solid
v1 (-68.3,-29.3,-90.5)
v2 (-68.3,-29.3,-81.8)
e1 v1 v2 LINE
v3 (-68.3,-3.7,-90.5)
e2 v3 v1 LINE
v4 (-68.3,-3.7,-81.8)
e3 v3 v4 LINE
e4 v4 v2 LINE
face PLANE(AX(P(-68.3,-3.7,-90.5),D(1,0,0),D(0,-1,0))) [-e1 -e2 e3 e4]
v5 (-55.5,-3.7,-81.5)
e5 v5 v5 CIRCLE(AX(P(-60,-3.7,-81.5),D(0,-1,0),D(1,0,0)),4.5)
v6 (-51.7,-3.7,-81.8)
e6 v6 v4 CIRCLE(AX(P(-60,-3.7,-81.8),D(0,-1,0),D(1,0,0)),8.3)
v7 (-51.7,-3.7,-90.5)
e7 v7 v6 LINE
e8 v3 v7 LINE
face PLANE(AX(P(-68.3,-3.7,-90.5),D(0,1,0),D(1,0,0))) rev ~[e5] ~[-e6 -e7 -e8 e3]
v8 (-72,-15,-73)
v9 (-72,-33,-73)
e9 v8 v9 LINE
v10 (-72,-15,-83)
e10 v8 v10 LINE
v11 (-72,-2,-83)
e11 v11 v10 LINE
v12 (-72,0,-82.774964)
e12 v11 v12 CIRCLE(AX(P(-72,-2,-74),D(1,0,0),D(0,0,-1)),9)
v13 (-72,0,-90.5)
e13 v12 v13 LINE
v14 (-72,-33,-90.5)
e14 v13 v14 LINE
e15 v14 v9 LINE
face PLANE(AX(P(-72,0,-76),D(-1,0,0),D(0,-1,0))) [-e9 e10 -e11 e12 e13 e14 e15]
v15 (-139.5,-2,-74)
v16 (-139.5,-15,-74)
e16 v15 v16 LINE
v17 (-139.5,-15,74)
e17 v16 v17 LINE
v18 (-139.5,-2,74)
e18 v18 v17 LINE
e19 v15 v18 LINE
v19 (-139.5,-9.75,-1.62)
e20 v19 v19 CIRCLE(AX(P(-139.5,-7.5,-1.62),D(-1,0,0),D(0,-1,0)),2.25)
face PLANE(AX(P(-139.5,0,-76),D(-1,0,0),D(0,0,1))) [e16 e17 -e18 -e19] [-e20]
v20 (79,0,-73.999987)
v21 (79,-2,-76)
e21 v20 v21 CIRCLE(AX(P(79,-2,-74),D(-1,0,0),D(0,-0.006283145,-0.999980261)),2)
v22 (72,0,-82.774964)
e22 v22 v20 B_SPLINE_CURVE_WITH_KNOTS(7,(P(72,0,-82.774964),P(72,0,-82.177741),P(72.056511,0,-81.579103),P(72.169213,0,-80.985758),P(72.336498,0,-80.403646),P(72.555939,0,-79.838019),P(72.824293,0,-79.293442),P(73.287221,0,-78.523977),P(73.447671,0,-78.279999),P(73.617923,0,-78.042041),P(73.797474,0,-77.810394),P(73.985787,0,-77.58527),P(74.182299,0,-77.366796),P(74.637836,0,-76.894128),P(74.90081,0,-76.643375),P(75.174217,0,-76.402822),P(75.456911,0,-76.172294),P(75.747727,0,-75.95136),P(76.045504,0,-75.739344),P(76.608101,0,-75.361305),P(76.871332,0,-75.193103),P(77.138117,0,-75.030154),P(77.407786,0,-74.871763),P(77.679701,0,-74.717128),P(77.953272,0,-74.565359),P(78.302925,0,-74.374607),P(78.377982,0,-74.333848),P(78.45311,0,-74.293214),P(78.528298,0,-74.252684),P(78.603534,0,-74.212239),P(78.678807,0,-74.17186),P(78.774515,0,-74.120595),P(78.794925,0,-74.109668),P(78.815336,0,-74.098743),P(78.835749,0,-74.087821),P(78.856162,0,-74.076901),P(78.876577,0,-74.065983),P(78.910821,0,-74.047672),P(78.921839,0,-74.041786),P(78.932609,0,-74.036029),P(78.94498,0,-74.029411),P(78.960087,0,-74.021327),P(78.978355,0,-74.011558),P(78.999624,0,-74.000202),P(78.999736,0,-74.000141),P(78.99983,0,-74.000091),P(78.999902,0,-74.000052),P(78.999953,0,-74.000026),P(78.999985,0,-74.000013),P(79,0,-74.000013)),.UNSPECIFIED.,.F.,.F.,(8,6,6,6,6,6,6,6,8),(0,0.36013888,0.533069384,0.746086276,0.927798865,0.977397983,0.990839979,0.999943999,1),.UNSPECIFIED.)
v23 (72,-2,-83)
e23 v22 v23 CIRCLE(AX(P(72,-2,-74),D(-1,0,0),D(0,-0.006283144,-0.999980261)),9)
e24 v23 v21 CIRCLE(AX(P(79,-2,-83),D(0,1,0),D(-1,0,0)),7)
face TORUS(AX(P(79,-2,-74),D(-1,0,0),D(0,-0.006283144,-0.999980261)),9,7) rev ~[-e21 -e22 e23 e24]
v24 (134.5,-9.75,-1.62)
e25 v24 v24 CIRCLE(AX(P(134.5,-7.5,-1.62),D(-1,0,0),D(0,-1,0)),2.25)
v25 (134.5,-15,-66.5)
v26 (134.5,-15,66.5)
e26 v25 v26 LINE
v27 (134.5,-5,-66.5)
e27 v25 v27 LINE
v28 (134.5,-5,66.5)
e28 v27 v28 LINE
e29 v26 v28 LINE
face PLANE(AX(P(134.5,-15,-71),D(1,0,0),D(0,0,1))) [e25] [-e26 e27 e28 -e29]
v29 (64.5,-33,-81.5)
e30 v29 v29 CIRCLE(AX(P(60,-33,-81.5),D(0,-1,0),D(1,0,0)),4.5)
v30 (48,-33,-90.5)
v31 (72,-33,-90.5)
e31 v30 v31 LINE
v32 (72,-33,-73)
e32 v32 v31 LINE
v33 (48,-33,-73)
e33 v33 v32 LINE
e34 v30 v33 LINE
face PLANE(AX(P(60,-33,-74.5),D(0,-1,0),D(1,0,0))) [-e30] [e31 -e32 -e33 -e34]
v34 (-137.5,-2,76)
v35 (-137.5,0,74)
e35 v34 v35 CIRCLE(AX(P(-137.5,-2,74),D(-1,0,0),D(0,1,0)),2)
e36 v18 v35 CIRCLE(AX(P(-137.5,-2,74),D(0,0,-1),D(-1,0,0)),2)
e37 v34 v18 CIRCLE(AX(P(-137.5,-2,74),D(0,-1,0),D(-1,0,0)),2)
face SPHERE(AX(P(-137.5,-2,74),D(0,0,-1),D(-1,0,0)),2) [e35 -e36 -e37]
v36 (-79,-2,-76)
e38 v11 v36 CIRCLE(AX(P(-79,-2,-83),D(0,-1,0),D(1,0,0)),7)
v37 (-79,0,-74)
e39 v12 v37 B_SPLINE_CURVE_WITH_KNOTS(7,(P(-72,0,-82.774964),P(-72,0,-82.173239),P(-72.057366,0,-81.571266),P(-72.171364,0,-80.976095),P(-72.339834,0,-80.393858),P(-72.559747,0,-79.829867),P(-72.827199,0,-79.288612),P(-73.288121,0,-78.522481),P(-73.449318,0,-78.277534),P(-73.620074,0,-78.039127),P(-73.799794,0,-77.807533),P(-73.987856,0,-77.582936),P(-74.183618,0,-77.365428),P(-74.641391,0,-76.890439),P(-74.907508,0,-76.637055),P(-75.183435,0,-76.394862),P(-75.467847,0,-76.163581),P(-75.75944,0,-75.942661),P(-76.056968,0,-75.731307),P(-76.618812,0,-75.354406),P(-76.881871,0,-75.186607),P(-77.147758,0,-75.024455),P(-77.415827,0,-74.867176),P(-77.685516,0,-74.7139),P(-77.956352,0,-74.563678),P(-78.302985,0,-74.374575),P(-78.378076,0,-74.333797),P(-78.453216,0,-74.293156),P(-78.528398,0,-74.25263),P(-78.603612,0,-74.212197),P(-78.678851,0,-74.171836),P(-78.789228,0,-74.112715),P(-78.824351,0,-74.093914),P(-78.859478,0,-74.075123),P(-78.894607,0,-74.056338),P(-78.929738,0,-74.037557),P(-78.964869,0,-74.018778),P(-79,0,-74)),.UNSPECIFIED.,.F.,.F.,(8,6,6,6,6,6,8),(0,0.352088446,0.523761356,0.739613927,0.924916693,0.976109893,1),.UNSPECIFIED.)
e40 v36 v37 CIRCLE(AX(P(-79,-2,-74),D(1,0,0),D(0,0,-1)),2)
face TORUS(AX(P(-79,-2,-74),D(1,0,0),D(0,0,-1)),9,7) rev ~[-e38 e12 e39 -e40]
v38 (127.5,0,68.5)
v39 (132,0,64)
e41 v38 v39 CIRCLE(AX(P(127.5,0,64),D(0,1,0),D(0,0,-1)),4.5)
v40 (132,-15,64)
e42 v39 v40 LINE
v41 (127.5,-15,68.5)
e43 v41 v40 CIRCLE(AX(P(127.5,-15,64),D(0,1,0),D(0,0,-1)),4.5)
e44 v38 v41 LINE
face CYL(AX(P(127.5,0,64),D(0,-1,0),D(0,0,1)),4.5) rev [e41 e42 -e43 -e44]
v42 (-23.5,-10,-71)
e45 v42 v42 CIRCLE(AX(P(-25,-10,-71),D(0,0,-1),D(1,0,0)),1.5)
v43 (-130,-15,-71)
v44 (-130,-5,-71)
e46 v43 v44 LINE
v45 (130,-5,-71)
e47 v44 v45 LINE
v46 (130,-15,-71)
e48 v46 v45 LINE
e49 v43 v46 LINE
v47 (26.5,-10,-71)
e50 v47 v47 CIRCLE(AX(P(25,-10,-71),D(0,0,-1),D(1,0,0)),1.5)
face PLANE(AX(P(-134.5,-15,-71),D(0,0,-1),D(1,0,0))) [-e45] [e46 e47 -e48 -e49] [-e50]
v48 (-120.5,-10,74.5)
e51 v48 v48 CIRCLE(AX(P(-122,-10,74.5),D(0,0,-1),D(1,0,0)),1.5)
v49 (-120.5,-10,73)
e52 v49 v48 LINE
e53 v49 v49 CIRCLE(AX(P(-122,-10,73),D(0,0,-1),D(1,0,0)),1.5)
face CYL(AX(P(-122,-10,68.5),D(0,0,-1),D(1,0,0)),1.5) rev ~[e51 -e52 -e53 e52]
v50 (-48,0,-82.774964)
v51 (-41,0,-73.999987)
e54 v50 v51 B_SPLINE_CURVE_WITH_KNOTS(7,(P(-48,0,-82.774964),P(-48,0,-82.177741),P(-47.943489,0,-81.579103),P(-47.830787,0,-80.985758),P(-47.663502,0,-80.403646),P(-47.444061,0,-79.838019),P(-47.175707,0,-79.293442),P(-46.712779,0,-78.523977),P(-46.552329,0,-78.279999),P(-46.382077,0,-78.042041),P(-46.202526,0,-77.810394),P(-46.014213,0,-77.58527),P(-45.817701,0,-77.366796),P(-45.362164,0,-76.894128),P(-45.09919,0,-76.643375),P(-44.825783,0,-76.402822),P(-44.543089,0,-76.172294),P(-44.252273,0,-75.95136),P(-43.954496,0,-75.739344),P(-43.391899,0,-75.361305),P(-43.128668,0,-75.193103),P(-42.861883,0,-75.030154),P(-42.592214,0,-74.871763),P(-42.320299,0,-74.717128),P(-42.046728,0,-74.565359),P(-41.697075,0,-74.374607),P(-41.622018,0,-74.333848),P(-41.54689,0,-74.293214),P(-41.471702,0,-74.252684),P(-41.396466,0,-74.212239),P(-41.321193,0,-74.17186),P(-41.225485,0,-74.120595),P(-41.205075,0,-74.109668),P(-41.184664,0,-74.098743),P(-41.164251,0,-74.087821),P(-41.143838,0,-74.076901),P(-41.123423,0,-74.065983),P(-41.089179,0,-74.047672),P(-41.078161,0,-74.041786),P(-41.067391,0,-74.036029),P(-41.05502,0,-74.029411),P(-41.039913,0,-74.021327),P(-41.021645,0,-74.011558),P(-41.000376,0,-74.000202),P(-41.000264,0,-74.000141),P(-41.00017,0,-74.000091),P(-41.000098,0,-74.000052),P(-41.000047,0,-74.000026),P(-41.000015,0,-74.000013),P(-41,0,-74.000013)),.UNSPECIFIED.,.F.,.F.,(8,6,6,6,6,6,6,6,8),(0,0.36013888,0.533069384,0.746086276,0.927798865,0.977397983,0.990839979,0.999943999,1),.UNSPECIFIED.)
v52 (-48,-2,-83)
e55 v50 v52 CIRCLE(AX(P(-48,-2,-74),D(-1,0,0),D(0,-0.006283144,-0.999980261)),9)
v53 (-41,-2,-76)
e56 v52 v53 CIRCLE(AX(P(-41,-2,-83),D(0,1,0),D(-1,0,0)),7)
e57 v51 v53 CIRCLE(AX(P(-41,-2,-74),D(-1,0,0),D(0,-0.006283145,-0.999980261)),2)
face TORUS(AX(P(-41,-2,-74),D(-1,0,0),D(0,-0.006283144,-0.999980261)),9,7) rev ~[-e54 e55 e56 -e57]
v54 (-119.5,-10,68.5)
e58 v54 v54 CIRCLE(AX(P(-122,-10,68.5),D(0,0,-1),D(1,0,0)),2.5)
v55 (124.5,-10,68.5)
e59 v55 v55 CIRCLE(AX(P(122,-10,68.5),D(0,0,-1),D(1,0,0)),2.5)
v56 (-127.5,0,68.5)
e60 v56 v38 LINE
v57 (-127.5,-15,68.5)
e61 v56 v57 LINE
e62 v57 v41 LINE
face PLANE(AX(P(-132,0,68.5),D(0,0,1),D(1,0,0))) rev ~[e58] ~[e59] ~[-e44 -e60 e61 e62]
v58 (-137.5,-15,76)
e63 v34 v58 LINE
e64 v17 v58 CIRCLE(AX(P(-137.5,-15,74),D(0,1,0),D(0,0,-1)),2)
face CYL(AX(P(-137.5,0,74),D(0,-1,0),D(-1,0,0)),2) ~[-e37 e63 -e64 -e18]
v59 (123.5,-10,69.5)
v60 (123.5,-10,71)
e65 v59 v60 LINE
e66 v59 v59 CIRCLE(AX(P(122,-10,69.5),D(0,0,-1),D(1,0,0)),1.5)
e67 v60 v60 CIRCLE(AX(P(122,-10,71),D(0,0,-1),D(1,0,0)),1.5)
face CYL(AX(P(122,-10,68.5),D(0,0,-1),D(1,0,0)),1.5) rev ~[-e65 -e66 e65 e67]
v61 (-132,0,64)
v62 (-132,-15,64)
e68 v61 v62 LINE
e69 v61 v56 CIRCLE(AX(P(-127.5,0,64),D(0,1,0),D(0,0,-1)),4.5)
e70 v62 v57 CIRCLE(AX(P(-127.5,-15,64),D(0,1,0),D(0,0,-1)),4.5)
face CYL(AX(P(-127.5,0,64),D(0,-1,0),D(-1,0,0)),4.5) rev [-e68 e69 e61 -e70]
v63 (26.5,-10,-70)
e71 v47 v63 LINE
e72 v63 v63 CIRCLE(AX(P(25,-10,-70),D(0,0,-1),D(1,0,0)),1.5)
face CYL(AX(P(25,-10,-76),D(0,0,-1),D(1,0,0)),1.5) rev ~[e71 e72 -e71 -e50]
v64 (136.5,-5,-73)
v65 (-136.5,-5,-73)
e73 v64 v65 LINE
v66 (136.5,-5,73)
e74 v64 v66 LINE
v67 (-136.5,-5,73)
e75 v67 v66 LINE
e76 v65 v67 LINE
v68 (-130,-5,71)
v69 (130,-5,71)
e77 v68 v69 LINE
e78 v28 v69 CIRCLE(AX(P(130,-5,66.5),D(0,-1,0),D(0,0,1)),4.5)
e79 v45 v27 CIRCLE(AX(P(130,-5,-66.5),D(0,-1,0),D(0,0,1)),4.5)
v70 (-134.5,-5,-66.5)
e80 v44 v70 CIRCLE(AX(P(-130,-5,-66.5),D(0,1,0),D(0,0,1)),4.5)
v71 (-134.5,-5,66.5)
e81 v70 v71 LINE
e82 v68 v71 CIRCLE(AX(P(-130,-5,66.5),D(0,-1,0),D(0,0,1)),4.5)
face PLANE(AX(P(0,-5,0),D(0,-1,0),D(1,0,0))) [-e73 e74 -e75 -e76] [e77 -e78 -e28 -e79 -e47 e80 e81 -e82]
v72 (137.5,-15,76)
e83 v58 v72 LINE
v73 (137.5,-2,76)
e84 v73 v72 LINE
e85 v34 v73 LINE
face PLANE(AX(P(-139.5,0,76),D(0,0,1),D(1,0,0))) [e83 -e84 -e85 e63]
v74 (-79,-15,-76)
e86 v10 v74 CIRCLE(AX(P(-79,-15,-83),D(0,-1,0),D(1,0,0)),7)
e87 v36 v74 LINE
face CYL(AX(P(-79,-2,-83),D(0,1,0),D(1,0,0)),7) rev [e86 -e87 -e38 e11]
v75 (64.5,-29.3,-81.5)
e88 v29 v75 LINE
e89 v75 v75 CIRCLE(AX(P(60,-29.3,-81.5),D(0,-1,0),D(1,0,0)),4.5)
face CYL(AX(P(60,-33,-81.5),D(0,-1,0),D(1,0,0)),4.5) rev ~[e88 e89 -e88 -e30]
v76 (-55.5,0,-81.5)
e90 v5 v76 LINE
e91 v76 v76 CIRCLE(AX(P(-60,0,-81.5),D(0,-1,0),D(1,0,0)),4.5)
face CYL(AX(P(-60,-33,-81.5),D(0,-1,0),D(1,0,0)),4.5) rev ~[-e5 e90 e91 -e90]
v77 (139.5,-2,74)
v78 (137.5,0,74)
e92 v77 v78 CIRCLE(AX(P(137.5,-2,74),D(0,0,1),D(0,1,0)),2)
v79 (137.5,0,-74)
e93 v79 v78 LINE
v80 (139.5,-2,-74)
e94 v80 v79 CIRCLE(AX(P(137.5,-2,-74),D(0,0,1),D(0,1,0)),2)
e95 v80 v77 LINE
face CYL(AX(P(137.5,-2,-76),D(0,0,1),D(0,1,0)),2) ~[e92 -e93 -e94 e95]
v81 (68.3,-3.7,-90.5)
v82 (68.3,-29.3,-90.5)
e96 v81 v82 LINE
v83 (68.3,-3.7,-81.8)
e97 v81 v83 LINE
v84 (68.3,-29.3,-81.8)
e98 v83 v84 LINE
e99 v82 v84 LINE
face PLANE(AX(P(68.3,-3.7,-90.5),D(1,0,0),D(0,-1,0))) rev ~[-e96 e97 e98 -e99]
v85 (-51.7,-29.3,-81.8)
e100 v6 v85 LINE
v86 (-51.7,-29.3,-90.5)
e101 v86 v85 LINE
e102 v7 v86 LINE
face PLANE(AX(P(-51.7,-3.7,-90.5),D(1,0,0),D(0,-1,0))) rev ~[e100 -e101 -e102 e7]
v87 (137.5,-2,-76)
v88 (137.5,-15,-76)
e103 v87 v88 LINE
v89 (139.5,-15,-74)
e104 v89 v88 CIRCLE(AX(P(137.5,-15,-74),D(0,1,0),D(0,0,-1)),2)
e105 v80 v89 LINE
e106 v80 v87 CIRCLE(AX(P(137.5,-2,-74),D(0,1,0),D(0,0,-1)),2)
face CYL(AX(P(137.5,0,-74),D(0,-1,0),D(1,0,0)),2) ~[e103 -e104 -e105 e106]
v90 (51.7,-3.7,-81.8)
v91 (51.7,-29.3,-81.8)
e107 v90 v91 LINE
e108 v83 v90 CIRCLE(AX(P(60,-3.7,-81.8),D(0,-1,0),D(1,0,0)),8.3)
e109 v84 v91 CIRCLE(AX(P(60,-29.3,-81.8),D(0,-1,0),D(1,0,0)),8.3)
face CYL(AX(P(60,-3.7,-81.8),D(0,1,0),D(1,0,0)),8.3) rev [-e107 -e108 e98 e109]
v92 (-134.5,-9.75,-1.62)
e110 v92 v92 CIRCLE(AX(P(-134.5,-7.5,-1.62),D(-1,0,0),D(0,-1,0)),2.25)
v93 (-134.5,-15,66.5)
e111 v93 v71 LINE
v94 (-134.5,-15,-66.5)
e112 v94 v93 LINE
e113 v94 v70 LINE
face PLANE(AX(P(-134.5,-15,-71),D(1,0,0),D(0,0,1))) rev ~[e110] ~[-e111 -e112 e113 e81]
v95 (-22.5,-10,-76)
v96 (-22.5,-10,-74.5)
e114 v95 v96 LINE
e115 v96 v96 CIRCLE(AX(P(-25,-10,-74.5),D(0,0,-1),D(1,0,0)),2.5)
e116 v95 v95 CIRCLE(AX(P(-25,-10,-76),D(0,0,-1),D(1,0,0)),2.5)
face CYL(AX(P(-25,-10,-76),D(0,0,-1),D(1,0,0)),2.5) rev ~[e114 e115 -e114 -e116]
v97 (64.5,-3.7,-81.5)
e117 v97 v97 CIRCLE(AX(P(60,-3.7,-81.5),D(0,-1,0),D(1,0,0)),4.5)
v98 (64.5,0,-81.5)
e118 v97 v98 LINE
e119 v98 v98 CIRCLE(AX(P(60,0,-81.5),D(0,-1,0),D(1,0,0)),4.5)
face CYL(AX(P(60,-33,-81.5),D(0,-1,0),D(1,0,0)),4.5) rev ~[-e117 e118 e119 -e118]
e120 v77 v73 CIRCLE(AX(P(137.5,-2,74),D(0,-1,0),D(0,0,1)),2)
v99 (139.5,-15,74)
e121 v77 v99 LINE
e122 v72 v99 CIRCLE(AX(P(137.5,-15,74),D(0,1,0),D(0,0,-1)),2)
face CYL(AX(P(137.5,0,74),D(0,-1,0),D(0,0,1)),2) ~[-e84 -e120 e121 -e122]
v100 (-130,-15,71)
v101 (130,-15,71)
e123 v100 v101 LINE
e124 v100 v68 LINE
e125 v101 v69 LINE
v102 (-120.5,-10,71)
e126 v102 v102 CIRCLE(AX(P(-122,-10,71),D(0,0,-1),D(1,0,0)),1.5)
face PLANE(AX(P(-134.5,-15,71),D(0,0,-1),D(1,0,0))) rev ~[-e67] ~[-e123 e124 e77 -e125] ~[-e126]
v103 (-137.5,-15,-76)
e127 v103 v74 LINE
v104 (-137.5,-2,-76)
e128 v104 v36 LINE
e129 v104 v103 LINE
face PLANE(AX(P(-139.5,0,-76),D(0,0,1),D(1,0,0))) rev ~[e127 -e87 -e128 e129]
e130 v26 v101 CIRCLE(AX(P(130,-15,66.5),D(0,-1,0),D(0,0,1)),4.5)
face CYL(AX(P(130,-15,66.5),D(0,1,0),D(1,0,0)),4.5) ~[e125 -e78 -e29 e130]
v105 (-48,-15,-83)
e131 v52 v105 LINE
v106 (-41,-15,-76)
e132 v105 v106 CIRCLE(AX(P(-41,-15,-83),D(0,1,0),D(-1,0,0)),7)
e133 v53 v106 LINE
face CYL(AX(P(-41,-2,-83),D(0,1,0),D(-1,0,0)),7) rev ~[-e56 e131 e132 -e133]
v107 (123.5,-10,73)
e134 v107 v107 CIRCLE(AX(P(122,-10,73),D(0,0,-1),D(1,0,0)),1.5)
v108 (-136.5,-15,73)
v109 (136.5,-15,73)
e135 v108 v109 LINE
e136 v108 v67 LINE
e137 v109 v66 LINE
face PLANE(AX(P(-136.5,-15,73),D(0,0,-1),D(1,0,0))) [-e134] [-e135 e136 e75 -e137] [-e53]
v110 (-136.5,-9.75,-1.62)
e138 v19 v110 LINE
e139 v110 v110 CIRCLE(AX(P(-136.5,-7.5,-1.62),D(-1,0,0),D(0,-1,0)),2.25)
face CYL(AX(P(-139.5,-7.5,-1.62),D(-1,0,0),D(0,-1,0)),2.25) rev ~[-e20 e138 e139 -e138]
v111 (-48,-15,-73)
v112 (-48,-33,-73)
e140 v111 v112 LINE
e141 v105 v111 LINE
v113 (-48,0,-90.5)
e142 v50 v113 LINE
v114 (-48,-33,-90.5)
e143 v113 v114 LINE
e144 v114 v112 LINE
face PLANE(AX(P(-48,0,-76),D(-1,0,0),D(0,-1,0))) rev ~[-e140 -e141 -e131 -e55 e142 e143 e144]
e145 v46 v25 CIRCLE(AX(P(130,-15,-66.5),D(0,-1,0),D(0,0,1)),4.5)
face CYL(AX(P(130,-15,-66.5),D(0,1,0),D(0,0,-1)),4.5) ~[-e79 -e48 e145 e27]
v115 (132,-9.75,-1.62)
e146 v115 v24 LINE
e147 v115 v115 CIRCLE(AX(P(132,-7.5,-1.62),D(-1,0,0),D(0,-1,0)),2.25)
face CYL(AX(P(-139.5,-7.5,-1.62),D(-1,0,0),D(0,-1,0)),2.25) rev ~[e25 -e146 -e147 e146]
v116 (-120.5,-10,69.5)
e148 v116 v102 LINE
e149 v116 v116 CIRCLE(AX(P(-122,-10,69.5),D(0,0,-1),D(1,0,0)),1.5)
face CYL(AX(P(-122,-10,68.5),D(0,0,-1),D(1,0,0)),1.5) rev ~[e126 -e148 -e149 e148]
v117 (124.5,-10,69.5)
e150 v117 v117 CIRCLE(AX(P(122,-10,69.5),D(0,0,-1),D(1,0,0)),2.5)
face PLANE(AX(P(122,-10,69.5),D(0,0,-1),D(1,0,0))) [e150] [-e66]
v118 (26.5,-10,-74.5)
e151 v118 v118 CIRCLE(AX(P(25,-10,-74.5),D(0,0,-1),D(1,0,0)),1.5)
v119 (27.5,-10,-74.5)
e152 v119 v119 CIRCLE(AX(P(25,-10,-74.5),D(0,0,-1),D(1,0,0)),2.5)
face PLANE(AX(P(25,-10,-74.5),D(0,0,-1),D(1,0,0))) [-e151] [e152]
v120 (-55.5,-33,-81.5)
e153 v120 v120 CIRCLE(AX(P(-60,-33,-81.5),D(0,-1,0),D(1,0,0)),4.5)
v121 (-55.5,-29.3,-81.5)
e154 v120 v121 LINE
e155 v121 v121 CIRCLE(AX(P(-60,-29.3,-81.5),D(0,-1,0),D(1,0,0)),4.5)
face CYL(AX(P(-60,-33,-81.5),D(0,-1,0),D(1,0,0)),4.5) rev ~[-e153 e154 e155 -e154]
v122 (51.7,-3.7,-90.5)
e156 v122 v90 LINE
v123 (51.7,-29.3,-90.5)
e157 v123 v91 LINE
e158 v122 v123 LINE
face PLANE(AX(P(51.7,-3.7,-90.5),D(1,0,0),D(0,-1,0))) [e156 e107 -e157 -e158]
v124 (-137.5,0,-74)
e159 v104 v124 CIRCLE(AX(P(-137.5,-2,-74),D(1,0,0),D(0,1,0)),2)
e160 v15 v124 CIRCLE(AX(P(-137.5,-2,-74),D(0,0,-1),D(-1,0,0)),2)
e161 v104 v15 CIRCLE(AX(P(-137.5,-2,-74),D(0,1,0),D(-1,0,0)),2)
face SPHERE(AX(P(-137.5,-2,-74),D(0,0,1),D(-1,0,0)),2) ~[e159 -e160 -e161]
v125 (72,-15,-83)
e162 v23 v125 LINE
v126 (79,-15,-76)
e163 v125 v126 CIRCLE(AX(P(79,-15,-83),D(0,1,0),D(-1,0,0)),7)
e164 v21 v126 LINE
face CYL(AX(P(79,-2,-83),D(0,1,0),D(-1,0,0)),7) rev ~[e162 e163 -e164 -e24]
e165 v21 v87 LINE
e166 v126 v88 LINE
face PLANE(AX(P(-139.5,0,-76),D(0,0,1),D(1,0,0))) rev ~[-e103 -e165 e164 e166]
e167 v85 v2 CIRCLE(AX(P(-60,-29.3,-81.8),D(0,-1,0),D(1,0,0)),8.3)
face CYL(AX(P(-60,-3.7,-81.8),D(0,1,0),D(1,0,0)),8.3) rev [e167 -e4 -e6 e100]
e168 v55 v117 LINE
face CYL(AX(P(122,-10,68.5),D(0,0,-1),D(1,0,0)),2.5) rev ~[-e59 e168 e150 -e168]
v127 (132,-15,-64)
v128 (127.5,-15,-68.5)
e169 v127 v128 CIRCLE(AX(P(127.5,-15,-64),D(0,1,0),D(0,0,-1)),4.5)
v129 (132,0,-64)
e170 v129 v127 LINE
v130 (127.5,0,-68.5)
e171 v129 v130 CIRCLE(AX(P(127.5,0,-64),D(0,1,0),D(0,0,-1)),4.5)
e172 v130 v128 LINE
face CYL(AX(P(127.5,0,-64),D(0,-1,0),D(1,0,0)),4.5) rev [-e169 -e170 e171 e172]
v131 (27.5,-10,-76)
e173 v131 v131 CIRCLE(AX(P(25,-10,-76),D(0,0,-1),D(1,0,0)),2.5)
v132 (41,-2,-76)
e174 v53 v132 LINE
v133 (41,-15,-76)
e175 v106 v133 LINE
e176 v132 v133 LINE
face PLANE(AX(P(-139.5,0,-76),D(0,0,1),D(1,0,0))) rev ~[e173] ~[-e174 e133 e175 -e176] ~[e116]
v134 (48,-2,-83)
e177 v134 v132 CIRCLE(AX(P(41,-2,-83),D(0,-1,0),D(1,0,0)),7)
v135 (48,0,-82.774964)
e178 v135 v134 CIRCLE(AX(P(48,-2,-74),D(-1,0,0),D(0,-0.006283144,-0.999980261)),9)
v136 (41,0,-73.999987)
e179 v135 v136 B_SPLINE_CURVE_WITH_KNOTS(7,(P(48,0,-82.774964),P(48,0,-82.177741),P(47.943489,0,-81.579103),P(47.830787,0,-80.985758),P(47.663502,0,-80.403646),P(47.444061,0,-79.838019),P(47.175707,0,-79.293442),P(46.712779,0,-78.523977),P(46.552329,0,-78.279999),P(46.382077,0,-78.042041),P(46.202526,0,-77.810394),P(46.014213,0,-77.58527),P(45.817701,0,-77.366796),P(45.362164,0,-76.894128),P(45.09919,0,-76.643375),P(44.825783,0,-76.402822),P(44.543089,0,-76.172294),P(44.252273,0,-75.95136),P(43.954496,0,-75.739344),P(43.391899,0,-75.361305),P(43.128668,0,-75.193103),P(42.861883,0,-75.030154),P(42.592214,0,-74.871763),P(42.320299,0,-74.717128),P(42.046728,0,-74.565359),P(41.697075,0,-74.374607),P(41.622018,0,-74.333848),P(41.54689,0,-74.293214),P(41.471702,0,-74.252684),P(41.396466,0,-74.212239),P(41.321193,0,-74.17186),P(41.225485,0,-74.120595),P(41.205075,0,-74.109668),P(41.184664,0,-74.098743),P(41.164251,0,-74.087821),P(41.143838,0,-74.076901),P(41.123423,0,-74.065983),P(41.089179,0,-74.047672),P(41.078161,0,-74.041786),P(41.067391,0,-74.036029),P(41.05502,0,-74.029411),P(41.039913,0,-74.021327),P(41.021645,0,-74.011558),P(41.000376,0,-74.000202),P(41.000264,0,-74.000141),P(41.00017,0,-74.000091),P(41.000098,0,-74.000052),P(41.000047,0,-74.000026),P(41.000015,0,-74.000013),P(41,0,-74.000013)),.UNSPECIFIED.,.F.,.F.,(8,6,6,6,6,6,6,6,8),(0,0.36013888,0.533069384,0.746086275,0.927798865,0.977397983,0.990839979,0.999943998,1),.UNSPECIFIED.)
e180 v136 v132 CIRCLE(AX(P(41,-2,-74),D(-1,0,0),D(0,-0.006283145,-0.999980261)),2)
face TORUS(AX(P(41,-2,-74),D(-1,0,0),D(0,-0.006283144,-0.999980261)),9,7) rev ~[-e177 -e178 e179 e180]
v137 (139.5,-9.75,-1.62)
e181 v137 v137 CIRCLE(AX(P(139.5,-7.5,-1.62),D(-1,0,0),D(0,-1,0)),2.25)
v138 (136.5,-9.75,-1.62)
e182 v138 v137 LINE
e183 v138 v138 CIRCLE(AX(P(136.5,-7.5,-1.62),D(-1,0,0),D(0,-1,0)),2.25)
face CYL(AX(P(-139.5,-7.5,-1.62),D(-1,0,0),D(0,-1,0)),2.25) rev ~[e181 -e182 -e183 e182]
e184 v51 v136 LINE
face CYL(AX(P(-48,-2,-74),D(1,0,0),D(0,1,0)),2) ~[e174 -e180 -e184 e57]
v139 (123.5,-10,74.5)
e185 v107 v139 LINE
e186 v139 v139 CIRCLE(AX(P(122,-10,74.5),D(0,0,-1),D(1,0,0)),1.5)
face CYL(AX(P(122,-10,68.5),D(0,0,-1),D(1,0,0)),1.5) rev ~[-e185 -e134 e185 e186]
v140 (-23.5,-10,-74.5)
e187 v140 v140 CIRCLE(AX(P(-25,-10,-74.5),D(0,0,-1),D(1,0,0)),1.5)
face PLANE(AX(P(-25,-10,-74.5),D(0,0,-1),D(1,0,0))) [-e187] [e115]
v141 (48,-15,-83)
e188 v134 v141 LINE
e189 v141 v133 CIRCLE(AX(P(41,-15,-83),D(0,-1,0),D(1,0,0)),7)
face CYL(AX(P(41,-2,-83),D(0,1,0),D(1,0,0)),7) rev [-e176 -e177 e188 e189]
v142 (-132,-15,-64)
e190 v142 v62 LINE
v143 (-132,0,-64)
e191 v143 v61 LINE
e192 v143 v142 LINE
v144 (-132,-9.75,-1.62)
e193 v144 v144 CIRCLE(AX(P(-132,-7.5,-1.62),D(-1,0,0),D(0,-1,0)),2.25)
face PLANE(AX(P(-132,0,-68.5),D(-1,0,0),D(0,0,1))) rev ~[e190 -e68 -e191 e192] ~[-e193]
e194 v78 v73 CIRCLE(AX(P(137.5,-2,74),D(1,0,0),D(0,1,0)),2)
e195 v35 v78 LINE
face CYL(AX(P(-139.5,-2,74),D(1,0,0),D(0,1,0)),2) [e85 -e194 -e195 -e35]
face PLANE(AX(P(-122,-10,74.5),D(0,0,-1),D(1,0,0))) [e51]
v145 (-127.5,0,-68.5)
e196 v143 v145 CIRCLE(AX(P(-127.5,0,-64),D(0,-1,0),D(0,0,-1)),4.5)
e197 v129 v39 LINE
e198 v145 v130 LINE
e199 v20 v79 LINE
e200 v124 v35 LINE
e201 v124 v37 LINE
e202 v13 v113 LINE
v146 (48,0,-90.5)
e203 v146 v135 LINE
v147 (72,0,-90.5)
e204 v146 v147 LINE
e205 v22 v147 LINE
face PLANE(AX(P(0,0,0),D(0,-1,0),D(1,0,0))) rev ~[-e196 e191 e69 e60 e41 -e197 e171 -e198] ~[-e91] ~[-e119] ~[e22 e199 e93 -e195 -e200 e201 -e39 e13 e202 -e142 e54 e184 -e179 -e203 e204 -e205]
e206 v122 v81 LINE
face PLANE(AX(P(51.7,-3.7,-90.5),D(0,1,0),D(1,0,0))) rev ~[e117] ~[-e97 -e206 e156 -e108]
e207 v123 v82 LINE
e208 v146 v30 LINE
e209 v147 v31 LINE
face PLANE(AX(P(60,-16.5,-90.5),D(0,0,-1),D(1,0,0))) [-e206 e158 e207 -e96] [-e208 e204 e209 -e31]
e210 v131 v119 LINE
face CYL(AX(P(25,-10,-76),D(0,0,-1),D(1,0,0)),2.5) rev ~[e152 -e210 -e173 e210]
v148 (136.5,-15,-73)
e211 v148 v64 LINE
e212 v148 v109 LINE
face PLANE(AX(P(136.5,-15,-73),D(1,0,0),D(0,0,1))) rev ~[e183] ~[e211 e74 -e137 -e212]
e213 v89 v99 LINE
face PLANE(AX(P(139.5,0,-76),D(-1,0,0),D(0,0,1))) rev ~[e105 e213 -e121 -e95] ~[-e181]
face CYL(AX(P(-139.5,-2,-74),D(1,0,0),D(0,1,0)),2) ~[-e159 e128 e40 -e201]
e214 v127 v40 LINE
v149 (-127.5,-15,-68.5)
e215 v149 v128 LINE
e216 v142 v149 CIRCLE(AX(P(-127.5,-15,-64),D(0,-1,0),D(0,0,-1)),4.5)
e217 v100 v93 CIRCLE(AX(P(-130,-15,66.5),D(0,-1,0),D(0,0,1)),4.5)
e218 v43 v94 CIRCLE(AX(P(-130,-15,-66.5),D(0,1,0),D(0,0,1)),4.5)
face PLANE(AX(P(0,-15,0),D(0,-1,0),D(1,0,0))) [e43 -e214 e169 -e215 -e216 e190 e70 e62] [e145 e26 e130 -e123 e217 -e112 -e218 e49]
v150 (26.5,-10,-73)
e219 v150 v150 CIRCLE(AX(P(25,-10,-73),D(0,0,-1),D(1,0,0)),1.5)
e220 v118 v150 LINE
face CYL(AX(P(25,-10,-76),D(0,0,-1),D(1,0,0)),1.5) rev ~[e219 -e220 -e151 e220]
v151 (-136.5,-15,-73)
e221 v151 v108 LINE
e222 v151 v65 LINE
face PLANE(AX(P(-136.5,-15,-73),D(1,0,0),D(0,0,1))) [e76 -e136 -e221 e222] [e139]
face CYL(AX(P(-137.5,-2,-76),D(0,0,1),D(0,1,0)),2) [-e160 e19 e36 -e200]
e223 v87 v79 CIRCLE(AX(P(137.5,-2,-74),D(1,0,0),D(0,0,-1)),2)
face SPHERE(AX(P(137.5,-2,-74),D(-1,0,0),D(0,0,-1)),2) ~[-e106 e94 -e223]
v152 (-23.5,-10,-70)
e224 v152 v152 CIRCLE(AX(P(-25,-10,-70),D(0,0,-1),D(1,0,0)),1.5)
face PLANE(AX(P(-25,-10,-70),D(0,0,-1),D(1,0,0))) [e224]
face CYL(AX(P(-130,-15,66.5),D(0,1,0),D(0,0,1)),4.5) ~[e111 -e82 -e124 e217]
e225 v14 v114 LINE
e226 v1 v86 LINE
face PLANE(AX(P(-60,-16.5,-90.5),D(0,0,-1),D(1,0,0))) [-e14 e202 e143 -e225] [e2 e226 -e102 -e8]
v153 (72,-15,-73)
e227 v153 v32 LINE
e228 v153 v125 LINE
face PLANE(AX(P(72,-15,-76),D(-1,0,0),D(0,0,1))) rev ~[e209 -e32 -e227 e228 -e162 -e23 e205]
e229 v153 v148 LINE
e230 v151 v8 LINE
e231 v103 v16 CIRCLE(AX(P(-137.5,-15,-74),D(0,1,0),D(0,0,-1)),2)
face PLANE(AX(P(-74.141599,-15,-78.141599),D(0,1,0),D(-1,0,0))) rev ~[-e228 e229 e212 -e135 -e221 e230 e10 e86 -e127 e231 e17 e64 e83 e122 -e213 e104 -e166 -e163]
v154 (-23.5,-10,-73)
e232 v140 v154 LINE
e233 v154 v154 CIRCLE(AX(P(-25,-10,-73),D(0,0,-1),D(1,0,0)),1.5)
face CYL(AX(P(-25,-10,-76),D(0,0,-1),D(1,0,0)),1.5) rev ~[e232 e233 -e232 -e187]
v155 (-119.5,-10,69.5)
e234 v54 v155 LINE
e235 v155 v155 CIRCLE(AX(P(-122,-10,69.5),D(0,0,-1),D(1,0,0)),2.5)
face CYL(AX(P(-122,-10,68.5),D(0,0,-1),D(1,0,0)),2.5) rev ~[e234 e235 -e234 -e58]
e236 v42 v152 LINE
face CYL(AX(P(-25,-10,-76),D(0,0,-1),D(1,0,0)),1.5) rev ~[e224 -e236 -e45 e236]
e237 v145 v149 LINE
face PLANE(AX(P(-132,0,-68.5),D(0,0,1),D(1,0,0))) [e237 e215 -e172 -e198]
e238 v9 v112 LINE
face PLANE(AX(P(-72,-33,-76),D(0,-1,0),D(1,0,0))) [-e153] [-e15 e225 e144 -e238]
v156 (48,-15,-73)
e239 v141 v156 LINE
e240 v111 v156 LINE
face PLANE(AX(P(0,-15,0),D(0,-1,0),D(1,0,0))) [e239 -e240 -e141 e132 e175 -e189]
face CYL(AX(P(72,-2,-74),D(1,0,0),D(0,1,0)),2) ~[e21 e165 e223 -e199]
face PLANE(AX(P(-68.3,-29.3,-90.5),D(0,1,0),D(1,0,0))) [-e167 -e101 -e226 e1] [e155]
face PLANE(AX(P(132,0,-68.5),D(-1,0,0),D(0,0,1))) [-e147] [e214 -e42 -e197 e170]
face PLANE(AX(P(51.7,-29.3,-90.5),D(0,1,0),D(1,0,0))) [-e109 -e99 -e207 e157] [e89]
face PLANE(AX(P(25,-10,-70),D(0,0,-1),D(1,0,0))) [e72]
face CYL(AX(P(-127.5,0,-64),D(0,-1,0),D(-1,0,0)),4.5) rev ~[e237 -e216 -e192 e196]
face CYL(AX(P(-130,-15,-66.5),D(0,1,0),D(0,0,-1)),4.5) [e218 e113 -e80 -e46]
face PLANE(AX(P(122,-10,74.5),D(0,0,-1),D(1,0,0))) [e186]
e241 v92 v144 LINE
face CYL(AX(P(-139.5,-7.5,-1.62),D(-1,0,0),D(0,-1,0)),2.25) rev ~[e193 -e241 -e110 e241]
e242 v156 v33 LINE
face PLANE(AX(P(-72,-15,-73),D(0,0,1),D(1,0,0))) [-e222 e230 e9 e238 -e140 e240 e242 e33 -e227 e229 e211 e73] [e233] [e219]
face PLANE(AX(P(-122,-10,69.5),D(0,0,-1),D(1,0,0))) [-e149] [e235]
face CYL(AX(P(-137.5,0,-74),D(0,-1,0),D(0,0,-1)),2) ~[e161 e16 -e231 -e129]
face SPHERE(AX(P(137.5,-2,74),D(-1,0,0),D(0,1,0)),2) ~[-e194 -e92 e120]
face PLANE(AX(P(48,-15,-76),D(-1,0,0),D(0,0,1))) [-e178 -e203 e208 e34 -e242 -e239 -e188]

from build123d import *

# Parameters (mm, degrees)
F0_W          = 279
F0_H          = 152
F0_W_2        = 264
F0_H_2        = 137
F1_DEPTH      = 15
F2_W          = 24
F2_H          = 3
F3_DEPTH      = 18
F4_W          = 24
F4_H          = 33
F5_DEPTH      = 14.5
F6_W          = 16.6
F6_H          = 25.6
F7_W          = 16.6
F7_H          = 25.6
F8_DEPTH      = 8.7
F10_R         = 8.3
F9_R          = 8.3
F11_DEPTH     = 25.6
F13_R         = 4.5
F12_R         = 4.5
F14_DEPTH     = 33.001
F15_W         = 273
F15_H         = 146
F15_W_2       = 269
F15_H_2       = 142
F16_DEPTH     = 10
F17_R         = 1.5
F18_DEPTH     = 6
F19_R         = 1.5
F20_DEPTH     = 6
F21_R         = 2
F22_R         = 2.25
F23_DEPTH     = 279.001
F24_R         = 4.5
F25_T1_DEPTH  = 13
F25_T6_ANGLE  = 359.64
F25_T12_ANGLE = 359.64
F25_T18_ANGLE = 359.64
F25_T24_ANGLE = 359.64
F26_R         = 2.5
F27_DEPTH     = 1
F28_R         = 2.5
F29_DEPTH     = 1.5


# Not quite as in the source:
# - a fillet or chamfer that OpenCascade refuses, or shapes differently, is made with other operations: its cross-section is extruded or revolved along the edge and cut away or added


with BuildPart() as f1:
    # F0 (on Front) → F1 (new body)
    with BuildSketch(Plane.XZ):
        Rectangle(F0_W, F0_H)
        Rectangle(F0_W_2, F0_H_2, mode=Mode.SUBTRACT)
    extrude(amount=F1_DEPTH)

    # F2 (on face) → F3 (join)
    with BuildSketch(Plane.XZ.offset(15)):
        with Locations((-60, -74.5)):
            Rectangle(F2_W, F2_H)
        with Locations((60, -74.5)):
            Rectangle(F2_W, F2_H)
    extrude(amount=F3_DEPTH)

    # F4 (on face) → F5 (join)
    with BuildSketch(Plane(origin=(0, 0, -76), x_dir=(1, 0, 0), z_dir=(0, 0, -1))):
        with Locations((-60, 16.5)):
            Rectangle(F4_W, F4_H)
        with Locations((60, 16.5)):
            Rectangle(F4_W, F4_H)
    extrude(amount=F5_DEPTH)

    # F6 (on face) + F7 (on face) → F8 (cut)
    with BuildSketch(Plane(origin=(0, 0, -90.5), x_dir=(1, 0, 0), z_dir=(0, 0, -1))):
        with Locations((-60, 16.5)):
            Rectangle(F6_W, F6_H)
    with BuildSketch(Plane(origin=(0, 0, -90.5), x_dir=(1, 0, 0), z_dir=(0, 0, -1))):
        with Locations((60, 16.5)):
            Rectangle(F7_W, F7_H)
    extrude(amount=-F8_DEPTH, mode=Mode.SUBTRACT)

    # F10 (on face) + F9 (on face) → F11 (cut)
    with BuildSketch(Plane.XZ.offset(3.7)):
        with Locations((60, -81.8)):
            Circle(F10_R)
    with BuildSketch(Plane.XZ.offset(3.7)):
        with Locations((-60, -81.8)):
            Circle(F9_R)
    extrude(amount=F11_DEPTH, mode=Mode.SUBTRACT)

    # F13 (on face) + F12 (on face) → F14 (cut, through all)
    with BuildSketch(Plane.XZ.offset(33)):
        with Locations((60, -81.5)):
            Circle(F13_R)
    with BuildSketch(Plane.XZ.offset(33)):
        with Locations((-60, -81.5)):
            Circle(F12_R)
    extrude(amount=-F14_DEPTH, mode=Mode.SUBTRACT)

    # F15 (on face) → F16 (cut)
    with BuildSketch(Plane.XZ.offset(15)):
        Rectangle(F15_W, F15_H)
        Rectangle(F15_W_2, F15_H_2, mode=Mode.SUBTRACT)
    extrude(amount=-F16_DEPTH, mode=Mode.SUBTRACT)

    # F17 (on face) → F18 (cut)
    with BuildSketch(Plane(origin=(0, 0, -76), x_dir=(1, 0, 0), z_dir=(0, 0, -1))):
        with Locations((-25, 10)):
            Circle(F17_R)
        with Locations((25, 10)):
            Circle(F17_R)
    extrude(amount=-F18_DEPTH, mode=Mode.SUBTRACT)

    # F19 (on face) → F20 (cut)
    with BuildSketch(Plane(origin=(0, 0, 68.5), x_dir=(1, 0, 0), z_dir=(0, 0, -1))):
        with Locations((-122, 10)):
            Circle(F19_R)
        with Locations((122, 10)):
            Circle(F19_R)
    extrude(amount=-F20_DEPTH, mode=Mode.SUBTRACT)

    # F21
    f21_edges = [f1.edges().sort_by_distance(p)[0] for p in [
        (-139.5, 0, 0),
        (-139.5, -7.5, 76),
        (0, 0, 76),
        (-139.5, -7.5, -76),
        (-105.75, 0, -76),
        (0, 0, -76),
        (105.75, 0, -76),
        (139.5, -7.5, -76),
        (139.5, 0, 0),
        (139.5, -7.5, 76),
    ]]
    fillet(f21_edges, radius=F21_R)

    # F22 (on face) → F23 (cut, through all)
    with BuildSketch(Plane(origin=(-139.5, 0, 0), x_dir=(0, -1, 0), z_dir=(-1, 0, 0))):
        with Locations((7.5, -1.62)):
            Circle(F22_R)
    extrude(amount=-F23_DEPTH, mode=Mode.SUBTRACT)

    # F24
    f24_edges = [f1.edges().sort_by_distance(p)[0] for p in [
        (-132, -7.5, 68.5),
        (-134.5, -10, 71),
        (-132, -7.5, -68.5),
        (-134.5, -10, -71),
        (132, -7.5, 68.5),
        (134.5, -10, -71),
        (132, -7.5, -68.5),
        (134.5, -10, 71),
    ]]
    fillet(f24_edges, radius=F24_R)

    # F25: fillet of radius 7 on 4 edges, made by hand

    # F25_s2 → F25_t1 (join)
    with BuildSketch(Plane.XZ.offset(2)):
        with BuildLine():
            ThreePointArc((-72, -83), (-74.0502525317, -78.0502525317), (-79, -76))
            Line((-79, -76), (-72, -76))
            Line((-72, -76), (-72, -83))
        make_face()
        with BuildLine():
            ThreePointArc((48, -83), (45.9497474683, -78.0502525317), (41, -76))
            Line((41, -76), (48, -76))
            Line((48, -76), (48, -83))
        make_face()
        with BuildLine():
            ThreePointArc((72, -83), (74.0502525317, -78.0502525317), (79, -76))
            Line((79, -76), (72, -76))
            Line((72, -76), (72, -83))
        make_face()
        with BuildLine():
            ThreePointArc((-48, -83), (-45.9497474683, -78.0502525317), (-41, -76))
            Line((-41, -76), (-48, -76))
            Line((-48, -76), (-48, -83))
        make_face()
    extrude(amount=F25_T1_DEPTH)


with BuildPart() as f25_tool4:
    # F25_s5 → F25_t6 (revolve)
    with BuildSketch(Plane(origin=(0, -1.5349775685, 0.0096446754), x_dir=(1, 0, 0), z_dir=(0, 0.9999802609, -0.006283144))):
        with BuildLine():
            ThreePointArc((-48, 83.0111055913), (-45.9497474683, 78.061358123), (-41, 76.0111055913))
            Line((-41, 76.0111055913), (-48, 76.0111055913))
            Line((-48, 76.0111055913), (-48, 83.0111055913))
        make_face()
    revolve(axis=Axis((-48, -2, -74), (-1, 0, 0)), revolution_arc=F25_T6_ANGLE)

    split(bisect_by=Plane.XZ, keep=Keep.TOP)

    split(bisect_by=Plane.XY.offset(-73), keep=Keep.BOTTOM)


with BuildPart() as f1_1:
    add(f1.part)

    # F25_t3: union F25_tool4
    add(f25_tool4.part)


with BuildPart() as f25_tool10:
    # F25_s11 → F25_t12 (revolve)
    with BuildSketch(Plane(origin=(0, -1.5349775685, 0.0096446754), x_dir=(1, 0, 0), z_dir=(0, 0.9999802609, -0.006283144))):
        with BuildLine():
            ThreePointArc((72, 83.0111055913), (74.0502525317, 78.061358123), (79, 76.0111055913))
            Line((79, 76.0111055913), (72, 76.0111055913))
            Line((72, 76.0111055913), (72, 83.0111055913))
        make_face()
    revolve(axis=Axis((72, -2, -74), (-1, 0, 0)), revolution_arc=F25_T12_ANGLE)

    split(bisect_by=Plane.XZ, keep=Keep.TOP)

    split(bisect_by=Plane.XY.offset(-73), keep=Keep.BOTTOM)


with BuildPart() as f1_2:
    add(f1_1.part)

    # F25_t9: union F25_tool10
    add(f25_tool10.part)


with BuildPart() as f25_tool16:
    # F25_s17 → F25_t18 (revolve)
    with BuildSketch(Plane(origin=(0, -1.5349775685, 0.0096446754), x_dir=(1, 0, 0), z_dir=(0, 0.9999802609, -0.006283144))):
        with BuildLine():
            ThreePointArc((41, 76.0111055913), (45.9497474683, 78.061358123), (48, 83.0111055913))
            Line((48, 83.0111055913), (48, 76.0111055913))
            Line((48, 76.0111055913), (41, 76.0111055913))
        make_face()
    revolve(axis=Axis((48, -2, -74), (-1, 0, 0)), revolution_arc=F25_T18_ANGLE)

    split(bisect_by=Plane.XZ, keep=Keep.TOP)

    split(bisect_by=Plane.XY.offset(-73), keep=Keep.BOTTOM)


with BuildPart() as f1_3:
    add(f1_2.part)

    # F25_t15: union F25_tool16
    add(f25_tool16.part)


with BuildPart() as f25_tool22:
    # F25_s23 → F25_t24 (revolve)
    with BuildSketch(Plane.XZ.offset(2)):
        with BuildLine():
            ThreePointArc((-72, -83), (-74.0502525317, -78.0502525317), (-79, -76))
            Line((-79, -76), (-72, -76))
            Line((-72, -76), (-72, -83))
        make_face()
    revolve(axis=Axis((-72, -2, -74), (1, 0, 0)), revolution_arc=F25_T24_ANGLE)

    split(bisect_by=Plane.XZ, keep=Keep.TOP)

    split(bisect_by=Plane.XY.offset(-73), keep=Keep.BOTTOM)


with BuildPart() as f1_4:
    add(f1_3.part)

    # F25_t21: union F25_tool22
    add(f25_tool22.part)

    # F26 (on face) → F27 (cut)
    with BuildSketch(Plane(origin=(0, 0, 68.5), x_dir=(1, 0, 0), z_dir=(0, 0, -1))):
        with Locations((-122, 10)):
            Circle(F26_R)
        with Locations((122, 10)):
            Circle(F26_R)
    extrude(amount=-F27_DEPTH, mode=Mode.SUBTRACT)

    # F28 (on face) → F29 (cut)
    with BuildSketch(Plane(origin=(0, 0, -76), x_dir=(1, 0, 0), z_dir=(0, 0, -1))):
        with Locations((-25, 10)):
            Circle(F28_R)
        with Locations((25, 10)):
            Circle(F28_R)
    extrude(amount=-F29_DEPTH, mode=Mode.SUBTRACT)


solid = f1_4.part
